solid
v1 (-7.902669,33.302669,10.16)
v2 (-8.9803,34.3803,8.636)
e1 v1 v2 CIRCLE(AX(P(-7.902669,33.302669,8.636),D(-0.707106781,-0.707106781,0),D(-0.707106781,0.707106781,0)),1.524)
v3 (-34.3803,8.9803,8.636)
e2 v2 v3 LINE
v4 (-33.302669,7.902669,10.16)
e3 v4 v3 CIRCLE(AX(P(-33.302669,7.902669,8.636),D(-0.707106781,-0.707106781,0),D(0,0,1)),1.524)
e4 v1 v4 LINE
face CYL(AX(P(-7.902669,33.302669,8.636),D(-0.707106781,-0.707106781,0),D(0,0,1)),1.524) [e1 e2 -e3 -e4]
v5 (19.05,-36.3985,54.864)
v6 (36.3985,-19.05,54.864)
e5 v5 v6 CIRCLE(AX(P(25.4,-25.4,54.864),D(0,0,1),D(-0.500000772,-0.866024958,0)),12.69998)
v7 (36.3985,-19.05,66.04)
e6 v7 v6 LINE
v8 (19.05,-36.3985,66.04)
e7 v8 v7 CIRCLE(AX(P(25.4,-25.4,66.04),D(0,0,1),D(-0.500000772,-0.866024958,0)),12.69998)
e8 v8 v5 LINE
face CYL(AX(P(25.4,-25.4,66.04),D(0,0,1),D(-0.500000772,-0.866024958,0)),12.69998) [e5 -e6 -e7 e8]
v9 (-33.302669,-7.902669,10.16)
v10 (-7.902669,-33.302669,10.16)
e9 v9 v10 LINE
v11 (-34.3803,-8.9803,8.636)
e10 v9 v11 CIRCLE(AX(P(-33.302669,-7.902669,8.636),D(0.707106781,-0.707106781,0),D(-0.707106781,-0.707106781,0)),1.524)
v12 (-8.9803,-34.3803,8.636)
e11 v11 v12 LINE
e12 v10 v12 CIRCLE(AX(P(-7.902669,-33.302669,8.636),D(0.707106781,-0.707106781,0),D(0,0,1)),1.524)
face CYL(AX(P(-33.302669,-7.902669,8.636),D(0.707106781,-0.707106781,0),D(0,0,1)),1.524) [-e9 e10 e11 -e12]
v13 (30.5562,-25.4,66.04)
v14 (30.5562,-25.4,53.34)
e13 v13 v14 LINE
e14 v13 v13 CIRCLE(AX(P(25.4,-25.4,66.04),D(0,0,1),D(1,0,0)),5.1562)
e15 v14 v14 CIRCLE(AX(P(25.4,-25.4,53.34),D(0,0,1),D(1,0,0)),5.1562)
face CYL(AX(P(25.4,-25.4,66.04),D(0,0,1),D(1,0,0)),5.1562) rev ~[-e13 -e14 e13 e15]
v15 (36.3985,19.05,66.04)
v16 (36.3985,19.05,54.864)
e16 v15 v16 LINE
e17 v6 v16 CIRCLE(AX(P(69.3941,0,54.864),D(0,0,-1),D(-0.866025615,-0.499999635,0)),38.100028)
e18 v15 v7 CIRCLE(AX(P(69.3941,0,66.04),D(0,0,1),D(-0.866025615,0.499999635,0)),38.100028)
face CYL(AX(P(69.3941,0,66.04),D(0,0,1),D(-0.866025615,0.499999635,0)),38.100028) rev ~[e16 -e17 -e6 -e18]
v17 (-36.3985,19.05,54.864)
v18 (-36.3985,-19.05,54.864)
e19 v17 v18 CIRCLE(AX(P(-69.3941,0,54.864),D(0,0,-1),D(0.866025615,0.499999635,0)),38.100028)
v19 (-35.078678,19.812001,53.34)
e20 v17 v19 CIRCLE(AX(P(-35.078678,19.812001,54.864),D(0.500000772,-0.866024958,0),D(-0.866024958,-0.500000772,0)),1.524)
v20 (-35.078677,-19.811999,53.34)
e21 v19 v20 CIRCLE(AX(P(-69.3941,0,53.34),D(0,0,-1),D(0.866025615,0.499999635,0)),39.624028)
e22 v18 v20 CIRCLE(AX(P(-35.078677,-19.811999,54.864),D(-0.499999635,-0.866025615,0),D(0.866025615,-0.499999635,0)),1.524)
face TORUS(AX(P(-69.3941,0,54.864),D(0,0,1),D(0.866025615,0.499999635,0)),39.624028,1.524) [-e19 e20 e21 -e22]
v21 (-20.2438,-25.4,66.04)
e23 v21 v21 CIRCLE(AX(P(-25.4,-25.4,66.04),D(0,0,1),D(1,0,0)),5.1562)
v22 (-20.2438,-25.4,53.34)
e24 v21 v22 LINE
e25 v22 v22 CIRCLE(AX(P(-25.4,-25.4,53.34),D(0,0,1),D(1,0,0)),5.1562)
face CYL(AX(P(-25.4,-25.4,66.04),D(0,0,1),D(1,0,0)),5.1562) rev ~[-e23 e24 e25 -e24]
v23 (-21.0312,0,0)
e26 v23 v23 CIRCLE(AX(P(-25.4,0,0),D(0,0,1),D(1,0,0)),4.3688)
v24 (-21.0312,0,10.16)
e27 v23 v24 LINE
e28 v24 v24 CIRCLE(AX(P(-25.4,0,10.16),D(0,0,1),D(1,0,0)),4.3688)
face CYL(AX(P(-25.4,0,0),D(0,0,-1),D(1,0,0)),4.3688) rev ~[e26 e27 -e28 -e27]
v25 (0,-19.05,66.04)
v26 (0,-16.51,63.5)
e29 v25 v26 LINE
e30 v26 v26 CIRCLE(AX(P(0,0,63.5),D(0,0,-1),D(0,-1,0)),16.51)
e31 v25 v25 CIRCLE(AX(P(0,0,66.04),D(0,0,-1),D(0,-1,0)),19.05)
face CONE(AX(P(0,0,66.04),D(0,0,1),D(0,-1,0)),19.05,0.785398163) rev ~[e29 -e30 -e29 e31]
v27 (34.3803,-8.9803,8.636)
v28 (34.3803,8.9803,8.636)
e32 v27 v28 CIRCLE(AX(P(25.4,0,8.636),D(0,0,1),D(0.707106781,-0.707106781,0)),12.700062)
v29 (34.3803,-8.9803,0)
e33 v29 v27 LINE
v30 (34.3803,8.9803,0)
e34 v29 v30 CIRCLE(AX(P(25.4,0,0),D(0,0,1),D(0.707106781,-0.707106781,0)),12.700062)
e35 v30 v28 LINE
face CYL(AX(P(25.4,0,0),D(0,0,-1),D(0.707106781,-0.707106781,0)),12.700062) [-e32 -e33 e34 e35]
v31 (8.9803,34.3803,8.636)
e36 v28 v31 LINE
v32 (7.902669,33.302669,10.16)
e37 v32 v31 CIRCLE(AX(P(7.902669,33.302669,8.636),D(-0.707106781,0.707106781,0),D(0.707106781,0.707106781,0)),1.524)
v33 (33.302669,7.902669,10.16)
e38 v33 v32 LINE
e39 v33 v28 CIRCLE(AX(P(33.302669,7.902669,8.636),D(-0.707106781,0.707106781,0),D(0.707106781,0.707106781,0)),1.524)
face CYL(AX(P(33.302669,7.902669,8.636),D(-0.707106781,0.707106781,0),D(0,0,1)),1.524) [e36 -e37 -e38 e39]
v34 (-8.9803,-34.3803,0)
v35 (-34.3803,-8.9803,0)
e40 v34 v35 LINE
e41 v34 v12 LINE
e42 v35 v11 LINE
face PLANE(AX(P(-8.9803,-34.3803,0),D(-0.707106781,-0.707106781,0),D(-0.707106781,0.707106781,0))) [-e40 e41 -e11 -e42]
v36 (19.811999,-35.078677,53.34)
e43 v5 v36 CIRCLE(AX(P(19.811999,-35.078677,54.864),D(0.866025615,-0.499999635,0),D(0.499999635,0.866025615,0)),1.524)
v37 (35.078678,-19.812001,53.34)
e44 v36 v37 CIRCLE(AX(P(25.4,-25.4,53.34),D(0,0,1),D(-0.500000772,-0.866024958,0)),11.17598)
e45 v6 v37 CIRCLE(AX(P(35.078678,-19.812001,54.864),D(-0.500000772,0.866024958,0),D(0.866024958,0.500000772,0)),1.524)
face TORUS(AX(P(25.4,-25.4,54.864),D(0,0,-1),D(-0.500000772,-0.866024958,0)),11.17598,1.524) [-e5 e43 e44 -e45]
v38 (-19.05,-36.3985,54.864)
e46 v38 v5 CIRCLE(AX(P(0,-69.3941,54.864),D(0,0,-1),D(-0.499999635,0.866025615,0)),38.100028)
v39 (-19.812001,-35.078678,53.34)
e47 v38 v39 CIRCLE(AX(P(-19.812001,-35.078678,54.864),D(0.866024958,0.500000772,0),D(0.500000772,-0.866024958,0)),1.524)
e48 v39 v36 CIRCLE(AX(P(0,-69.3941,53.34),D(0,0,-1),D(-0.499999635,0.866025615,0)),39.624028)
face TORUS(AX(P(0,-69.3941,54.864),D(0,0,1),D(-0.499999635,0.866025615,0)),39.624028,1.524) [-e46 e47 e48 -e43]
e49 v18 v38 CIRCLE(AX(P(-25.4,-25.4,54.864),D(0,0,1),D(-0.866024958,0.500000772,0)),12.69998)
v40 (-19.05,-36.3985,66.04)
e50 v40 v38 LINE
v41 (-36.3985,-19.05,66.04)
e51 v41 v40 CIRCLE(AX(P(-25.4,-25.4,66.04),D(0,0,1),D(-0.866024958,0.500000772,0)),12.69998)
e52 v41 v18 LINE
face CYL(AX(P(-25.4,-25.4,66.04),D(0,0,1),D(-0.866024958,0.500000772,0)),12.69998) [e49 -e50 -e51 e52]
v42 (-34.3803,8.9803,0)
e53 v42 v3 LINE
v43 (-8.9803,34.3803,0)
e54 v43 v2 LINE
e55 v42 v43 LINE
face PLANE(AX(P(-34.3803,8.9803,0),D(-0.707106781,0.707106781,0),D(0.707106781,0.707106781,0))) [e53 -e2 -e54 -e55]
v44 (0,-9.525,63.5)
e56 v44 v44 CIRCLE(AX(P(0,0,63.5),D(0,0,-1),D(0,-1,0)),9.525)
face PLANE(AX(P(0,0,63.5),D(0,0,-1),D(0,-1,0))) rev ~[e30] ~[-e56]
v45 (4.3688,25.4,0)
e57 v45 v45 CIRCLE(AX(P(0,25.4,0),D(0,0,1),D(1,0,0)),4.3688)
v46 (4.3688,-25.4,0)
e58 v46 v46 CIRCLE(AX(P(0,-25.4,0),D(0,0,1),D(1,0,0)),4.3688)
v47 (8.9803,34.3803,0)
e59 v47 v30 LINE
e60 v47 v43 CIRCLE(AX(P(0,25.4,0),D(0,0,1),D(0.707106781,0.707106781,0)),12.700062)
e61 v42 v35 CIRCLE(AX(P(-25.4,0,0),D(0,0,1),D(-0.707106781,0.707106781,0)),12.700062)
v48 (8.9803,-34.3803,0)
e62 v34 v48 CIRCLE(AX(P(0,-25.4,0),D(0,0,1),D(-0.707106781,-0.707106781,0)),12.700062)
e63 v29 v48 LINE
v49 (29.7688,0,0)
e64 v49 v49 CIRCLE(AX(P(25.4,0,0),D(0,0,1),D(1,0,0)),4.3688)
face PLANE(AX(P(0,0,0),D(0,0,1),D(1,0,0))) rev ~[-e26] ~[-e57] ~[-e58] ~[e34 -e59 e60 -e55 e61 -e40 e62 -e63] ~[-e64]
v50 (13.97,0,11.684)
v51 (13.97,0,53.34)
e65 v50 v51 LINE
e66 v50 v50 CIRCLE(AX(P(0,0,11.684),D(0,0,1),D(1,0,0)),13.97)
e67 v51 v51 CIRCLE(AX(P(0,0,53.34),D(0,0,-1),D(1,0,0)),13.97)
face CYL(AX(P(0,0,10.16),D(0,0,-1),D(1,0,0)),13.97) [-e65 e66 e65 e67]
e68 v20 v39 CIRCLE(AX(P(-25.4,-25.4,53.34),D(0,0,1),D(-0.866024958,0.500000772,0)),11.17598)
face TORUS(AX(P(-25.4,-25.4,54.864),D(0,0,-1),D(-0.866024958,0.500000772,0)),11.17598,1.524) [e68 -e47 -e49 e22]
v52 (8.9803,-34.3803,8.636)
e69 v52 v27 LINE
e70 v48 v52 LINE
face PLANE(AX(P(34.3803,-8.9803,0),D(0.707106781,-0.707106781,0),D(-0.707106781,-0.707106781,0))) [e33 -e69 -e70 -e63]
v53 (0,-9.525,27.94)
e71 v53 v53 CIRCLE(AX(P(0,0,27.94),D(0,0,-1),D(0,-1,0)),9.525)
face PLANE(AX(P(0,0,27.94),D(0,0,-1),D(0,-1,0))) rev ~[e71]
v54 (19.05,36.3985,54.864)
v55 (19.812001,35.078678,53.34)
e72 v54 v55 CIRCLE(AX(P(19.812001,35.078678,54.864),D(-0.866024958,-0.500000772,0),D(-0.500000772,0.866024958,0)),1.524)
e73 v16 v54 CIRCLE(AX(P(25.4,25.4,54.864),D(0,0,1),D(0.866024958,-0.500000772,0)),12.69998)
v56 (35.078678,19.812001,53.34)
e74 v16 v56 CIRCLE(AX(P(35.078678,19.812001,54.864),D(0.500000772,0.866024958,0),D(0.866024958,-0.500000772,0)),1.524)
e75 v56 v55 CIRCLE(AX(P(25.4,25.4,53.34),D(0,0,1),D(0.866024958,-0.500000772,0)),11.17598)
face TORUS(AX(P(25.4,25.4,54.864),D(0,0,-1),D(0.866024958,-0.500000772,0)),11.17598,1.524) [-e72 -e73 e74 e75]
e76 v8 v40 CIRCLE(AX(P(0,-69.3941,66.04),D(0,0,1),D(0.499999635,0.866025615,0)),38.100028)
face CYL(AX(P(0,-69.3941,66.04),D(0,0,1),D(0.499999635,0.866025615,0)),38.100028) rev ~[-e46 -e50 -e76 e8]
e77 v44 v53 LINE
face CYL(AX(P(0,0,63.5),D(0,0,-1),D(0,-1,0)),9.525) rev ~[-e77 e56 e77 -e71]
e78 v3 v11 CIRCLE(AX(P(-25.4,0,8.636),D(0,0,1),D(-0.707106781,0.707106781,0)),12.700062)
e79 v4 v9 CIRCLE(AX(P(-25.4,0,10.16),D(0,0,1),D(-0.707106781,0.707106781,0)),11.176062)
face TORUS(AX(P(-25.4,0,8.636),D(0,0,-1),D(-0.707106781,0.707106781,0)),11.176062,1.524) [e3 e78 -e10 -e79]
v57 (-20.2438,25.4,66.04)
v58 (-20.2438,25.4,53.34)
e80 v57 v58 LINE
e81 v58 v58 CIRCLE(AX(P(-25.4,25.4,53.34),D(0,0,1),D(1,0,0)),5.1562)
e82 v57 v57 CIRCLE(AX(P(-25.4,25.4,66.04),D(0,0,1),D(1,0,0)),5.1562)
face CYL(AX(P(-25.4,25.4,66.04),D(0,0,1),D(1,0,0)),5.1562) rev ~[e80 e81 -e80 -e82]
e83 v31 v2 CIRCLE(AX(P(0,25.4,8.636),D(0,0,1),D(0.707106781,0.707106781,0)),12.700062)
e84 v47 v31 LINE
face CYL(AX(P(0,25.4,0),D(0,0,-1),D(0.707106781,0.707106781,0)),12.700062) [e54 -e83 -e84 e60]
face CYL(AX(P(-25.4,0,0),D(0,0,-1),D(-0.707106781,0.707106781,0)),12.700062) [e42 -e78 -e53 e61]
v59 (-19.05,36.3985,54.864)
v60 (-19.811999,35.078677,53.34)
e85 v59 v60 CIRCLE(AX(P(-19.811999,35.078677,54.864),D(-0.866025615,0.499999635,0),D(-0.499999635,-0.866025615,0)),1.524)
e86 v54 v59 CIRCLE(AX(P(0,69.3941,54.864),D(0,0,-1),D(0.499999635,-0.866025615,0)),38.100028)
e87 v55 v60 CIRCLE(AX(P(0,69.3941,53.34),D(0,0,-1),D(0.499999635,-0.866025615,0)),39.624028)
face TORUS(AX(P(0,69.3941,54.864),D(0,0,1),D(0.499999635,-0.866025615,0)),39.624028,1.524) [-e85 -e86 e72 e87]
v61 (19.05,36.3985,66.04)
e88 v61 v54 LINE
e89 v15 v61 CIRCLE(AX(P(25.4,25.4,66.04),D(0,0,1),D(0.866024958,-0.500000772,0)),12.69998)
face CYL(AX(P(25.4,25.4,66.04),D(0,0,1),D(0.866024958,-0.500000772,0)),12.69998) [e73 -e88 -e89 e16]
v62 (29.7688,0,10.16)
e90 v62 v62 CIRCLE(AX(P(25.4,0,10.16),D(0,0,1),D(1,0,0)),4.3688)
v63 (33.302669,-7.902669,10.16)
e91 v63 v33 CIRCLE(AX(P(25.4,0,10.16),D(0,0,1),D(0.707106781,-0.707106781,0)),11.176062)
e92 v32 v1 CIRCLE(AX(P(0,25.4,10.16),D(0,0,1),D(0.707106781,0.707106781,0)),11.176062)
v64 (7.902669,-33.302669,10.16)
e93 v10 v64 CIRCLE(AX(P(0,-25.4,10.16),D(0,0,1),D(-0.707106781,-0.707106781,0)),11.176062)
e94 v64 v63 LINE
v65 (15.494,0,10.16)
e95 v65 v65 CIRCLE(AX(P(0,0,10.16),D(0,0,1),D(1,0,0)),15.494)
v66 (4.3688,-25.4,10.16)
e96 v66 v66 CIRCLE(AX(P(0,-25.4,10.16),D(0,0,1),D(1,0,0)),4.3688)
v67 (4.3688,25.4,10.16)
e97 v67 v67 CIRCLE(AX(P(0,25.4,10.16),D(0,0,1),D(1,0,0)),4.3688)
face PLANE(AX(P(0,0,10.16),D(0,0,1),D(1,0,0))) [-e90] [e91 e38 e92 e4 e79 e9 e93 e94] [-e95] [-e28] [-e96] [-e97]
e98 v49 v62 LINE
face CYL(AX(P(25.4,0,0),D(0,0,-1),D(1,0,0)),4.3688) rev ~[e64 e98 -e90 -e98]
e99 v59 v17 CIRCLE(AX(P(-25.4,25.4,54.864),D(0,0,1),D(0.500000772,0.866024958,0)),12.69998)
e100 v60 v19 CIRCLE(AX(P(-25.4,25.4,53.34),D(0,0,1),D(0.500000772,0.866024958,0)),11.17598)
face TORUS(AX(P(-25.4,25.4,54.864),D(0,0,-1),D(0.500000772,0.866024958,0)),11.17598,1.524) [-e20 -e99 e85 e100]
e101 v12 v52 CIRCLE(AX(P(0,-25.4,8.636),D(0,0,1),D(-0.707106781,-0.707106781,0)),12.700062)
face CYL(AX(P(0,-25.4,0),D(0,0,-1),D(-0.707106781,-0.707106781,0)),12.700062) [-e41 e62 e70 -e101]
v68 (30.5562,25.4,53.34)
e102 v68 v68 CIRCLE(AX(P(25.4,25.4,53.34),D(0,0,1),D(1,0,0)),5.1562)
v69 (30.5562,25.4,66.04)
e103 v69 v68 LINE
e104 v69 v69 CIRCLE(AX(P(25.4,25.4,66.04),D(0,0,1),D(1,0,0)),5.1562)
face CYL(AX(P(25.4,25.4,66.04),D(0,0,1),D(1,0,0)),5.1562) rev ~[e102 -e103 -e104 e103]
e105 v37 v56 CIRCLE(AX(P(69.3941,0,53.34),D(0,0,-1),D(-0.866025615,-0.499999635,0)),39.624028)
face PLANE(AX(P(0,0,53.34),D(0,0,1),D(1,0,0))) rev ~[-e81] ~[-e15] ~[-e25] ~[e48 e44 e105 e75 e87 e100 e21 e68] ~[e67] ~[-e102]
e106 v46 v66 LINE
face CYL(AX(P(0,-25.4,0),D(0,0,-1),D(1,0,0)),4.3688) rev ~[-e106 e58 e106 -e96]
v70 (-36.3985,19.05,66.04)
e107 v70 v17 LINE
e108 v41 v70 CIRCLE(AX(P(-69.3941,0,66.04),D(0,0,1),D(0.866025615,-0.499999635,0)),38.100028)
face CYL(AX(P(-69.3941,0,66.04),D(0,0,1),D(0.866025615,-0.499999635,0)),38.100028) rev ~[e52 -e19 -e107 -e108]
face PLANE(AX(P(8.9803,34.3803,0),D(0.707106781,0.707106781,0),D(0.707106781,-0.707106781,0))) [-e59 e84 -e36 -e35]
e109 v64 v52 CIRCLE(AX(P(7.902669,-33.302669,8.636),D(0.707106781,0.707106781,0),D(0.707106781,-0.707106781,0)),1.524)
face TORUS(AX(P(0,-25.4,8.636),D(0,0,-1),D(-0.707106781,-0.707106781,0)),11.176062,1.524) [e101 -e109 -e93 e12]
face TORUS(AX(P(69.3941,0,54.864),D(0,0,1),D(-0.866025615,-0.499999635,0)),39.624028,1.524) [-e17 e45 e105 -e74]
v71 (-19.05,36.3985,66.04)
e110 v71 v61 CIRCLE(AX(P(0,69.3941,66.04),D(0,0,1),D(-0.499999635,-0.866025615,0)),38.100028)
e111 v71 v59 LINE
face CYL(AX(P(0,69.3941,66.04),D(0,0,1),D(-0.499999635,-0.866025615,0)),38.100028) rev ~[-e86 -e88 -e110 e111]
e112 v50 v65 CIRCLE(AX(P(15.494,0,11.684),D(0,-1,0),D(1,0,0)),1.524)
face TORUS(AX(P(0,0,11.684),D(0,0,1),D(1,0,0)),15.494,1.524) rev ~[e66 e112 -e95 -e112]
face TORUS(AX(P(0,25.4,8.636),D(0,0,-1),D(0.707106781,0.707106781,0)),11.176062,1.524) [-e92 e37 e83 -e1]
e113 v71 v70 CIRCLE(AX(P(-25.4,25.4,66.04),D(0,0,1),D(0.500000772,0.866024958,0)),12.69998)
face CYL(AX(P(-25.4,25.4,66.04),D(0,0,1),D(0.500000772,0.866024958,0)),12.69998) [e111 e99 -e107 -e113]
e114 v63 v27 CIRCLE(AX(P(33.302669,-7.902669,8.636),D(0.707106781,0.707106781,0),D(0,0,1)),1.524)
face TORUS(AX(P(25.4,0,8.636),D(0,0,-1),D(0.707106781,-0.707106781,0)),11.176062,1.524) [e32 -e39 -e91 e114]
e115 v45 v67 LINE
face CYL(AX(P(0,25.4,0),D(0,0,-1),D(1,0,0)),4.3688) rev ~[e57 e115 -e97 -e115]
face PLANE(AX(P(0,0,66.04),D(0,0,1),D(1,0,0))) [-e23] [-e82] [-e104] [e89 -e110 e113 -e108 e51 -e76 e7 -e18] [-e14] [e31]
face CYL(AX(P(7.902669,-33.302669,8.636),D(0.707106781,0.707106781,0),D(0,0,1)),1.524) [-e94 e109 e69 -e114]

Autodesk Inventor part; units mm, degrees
ref_plane "YZ Plane" through (0, 0, 0) normal (1, 0, 0) x (0, 1, 0)
ref_plane "XZ Plane" through (0, 0, 0) normal (0, 1, 0) x (-1, 0, 0)
ref_plane "XY Plane" through (0, 0, 0) normal (0, 0, 1) x (1, 0, 0)
sketch "Boceto3" plane through (0, 0, 0) normal (0, 0, 1) x (1, 0, 0)
  line L0 (-53.34, 0) -> (53.34, 0) construction
  line L1 (0, -53.34) -> (0, 53.34) construction
  line L2 (0, -25.4) -> (25.4, 0) construction
  line L3 (25.4, 0) -> (0, 25.4) construction
  line L4 (0, 25.4) -> (-25.4, 0) construction
  line L5 (-25.4, 0) -> (0, -25.4) construction
  line L6 (0, -25.4) -> (0, 25.4) construction
  line L7 (25.4, 0) -> (-25.4, 0) construction
  arc A0 (-34.3803, 8.9803) -> (-34.3803, -8.9803) centre (-25.4, 0) ccw
  arc A1 (8.9803, 34.3803) -> (-8.9803, 34.3803) centre (0, 25.4) ccw
  arc A2 (34.3803, -8.9803) -> (34.3803, 8.9803) centre (25.4, 0) ccw
  arc A3 (-8.9803, -34.3803) -> (8.9803, -34.3803) centre (0, -25.4) ccw
  circle A4 centre (-25.4, 0) radius 4.3688
  circle A5 centre (0, 25.4) radius 4.3688
  circle A6 centre (25.4, 0) radius 4.3688
  circle A7 centre (0, -25.4) radius 4.3688
  line L8 (-34.3803, 8.9803) -> (-8.9803, 34.3803)
  line L9 (8.9803, 34.3803) -> (34.3803, 8.9803)
  line L10 (34.3803, -8.9803) -> (8.9803, -34.3803)
  line L11 (-8.9803, -34.3803) -> (-34.3803, -8.9803)
  point P0 (0, 0)
  dimension "d30" = 25.4
  dimension "d31" = 50.8
  dimension "d32" = 50.8
  dimension "d33" = 25.4
  dimension "d34" = 12.7
  dimension "d35" = 12.7
  dimension "d36" = 12.7
  dimension "d37" = 12.7
  dimension "d38" = 8.7376
  dimension "d39" = 8.7376
  dimension "d40" = 8.7376
  dimension "d41" = 8.7376
extrude "Base" add sketch "Boceto3" along normal blind 10.16
sketch "Boceto4" plane through (0, 0, 10.16) normal (0, 0, 1) x (1, 0, 0)
  circle A0 centre (0, 0) radius 13.97
  dimension "d44" = 27.94
extrude "Cilindro" add sketch "Boceto4" along normal blind 55.88
sketch "Boceto5" plane through (0, 0, 66.04) normal (0, 0, 1) x (1, 0, 0)
  line L0 (-25.4, -25.4) -> (25.4, -25.4) construction
  line L1 (25.4, -25.4) -> (25.4, 25.4) construction
  line L2 (25.4, 25.4) -> (-25.4, 25.4) construction
  line L3 (-25.4, 25.4) -> (-25.4, -25.4) construction
  line L4 (-25.4, -25.4) -> (25.4, 25.4) construction
  line L5 (25.4, -25.4) -> (-25.4, 25.4) construction
  arc A0 (-19.05, 36.3985) -> (-36.3985, 19.05) centre (-25.4, 25.4) ccw
  arc A1 (-36.3985, -19.05) -> (-19.05, -36.3985) centre (-25.4, -25.4) ccw
  arc A2 (19.05, -36.3985) -> (36.3985, -19.05) centre (25.4, -25.4) ccw
  arc A3 (36.3985, 19.05) -> (19.05, 36.3985) centre (25.4, 25.4) ccw
  circle A4 centre (-25.4, 25.4) radius 5.1562
  circle A5 centre (-25.4, -25.4) radius 5.1562
  circle A6 centre (25.4, -25.4) radius 5.1562
  circle A7 centre (25.4, 25.4) radius 5.1562
  arc A8 (-36.3985, -19.05) -> (-36.3985, 19.05) centre (-69.3941, 0) ccw
  arc A9 (-19.05, 36.3985) -> (19.05, 36.3985) centre (0, 69.3941) ccw
  arc A10 (36.3985, 19.05) -> (36.3985, -19.05) centre (69.3941, 0) ccw
  arc A11 (19.05, -36.3985) -> (-19.05, -36.3985) centre (0, -69.3941) ccw
  point P0 (0, 0)
  dimension "d47" = 50.8
  dimension "d48" = 50.8
  dimension "d49" = 25.4
  dimension "d50" = 25.4
  dimension "d51" = 25.4
  dimension "d52" = 25.4
  dimension "d53" = 10.3124
  dimension "d54" = 10.3124
  dimension "d55" = 10.3124
  dimension "d56" = 10.3124
  dimension "d57" = 25.4
  dimension "d58" = 76.2
  dimension "d59" = 76.2
  dimension "d60" = 76.2
  dimension "d61" = 76.2
extrude "Extrusión5" add sketch "Boceto5" against normal blind 12.7
sketch "Boceto6" plane through (0, 0, 66.04) normal (0, 0, 1) x (1, 0, 0)
  point P0 (0, 0)
  point P1 (0, 0)
hole "Agujero1" at (0, 0, 66.04) direction (0, 0, -1) diameter 19.05 depth 38.1 counterbore diameter 38.1 counterbore depth 2.54
draft "Cara para el ángulo de desmoldeo1" angle 45 pull direction (0, 0, 1) faces at (1.5329, -18.9882, 65.1933) fixed edges at (0, 19.05, 66.04)
fillet "Empalme1" radius 1.524 17 edges at (0, 38.1, 10.16) (-21.6803, 21.6803, 10.16) (-38.1, 0, 10.16) (-21.6803, -21.6803, 10.16) (0, -38.1, 10.16) (21.6803, -21.6803, 10.16) (38.1, 0, 10.16) (21.6803, 21.6803, 10.16) (-13.97, 0, 10.16) (34.3803, 34.3803, 53.34) (31.2941, 0, 53.34) (34.3803, -34.3803, 53.34) (0, -31.2941, 53.34) (-34.3803, -34.3803, 53.34) (-31.2941, 0, 53.34) (-34.3803, 34.3803, 53.34) (0, 31.2941, 53.34)
properties part number "Lab6A01209499P2"
